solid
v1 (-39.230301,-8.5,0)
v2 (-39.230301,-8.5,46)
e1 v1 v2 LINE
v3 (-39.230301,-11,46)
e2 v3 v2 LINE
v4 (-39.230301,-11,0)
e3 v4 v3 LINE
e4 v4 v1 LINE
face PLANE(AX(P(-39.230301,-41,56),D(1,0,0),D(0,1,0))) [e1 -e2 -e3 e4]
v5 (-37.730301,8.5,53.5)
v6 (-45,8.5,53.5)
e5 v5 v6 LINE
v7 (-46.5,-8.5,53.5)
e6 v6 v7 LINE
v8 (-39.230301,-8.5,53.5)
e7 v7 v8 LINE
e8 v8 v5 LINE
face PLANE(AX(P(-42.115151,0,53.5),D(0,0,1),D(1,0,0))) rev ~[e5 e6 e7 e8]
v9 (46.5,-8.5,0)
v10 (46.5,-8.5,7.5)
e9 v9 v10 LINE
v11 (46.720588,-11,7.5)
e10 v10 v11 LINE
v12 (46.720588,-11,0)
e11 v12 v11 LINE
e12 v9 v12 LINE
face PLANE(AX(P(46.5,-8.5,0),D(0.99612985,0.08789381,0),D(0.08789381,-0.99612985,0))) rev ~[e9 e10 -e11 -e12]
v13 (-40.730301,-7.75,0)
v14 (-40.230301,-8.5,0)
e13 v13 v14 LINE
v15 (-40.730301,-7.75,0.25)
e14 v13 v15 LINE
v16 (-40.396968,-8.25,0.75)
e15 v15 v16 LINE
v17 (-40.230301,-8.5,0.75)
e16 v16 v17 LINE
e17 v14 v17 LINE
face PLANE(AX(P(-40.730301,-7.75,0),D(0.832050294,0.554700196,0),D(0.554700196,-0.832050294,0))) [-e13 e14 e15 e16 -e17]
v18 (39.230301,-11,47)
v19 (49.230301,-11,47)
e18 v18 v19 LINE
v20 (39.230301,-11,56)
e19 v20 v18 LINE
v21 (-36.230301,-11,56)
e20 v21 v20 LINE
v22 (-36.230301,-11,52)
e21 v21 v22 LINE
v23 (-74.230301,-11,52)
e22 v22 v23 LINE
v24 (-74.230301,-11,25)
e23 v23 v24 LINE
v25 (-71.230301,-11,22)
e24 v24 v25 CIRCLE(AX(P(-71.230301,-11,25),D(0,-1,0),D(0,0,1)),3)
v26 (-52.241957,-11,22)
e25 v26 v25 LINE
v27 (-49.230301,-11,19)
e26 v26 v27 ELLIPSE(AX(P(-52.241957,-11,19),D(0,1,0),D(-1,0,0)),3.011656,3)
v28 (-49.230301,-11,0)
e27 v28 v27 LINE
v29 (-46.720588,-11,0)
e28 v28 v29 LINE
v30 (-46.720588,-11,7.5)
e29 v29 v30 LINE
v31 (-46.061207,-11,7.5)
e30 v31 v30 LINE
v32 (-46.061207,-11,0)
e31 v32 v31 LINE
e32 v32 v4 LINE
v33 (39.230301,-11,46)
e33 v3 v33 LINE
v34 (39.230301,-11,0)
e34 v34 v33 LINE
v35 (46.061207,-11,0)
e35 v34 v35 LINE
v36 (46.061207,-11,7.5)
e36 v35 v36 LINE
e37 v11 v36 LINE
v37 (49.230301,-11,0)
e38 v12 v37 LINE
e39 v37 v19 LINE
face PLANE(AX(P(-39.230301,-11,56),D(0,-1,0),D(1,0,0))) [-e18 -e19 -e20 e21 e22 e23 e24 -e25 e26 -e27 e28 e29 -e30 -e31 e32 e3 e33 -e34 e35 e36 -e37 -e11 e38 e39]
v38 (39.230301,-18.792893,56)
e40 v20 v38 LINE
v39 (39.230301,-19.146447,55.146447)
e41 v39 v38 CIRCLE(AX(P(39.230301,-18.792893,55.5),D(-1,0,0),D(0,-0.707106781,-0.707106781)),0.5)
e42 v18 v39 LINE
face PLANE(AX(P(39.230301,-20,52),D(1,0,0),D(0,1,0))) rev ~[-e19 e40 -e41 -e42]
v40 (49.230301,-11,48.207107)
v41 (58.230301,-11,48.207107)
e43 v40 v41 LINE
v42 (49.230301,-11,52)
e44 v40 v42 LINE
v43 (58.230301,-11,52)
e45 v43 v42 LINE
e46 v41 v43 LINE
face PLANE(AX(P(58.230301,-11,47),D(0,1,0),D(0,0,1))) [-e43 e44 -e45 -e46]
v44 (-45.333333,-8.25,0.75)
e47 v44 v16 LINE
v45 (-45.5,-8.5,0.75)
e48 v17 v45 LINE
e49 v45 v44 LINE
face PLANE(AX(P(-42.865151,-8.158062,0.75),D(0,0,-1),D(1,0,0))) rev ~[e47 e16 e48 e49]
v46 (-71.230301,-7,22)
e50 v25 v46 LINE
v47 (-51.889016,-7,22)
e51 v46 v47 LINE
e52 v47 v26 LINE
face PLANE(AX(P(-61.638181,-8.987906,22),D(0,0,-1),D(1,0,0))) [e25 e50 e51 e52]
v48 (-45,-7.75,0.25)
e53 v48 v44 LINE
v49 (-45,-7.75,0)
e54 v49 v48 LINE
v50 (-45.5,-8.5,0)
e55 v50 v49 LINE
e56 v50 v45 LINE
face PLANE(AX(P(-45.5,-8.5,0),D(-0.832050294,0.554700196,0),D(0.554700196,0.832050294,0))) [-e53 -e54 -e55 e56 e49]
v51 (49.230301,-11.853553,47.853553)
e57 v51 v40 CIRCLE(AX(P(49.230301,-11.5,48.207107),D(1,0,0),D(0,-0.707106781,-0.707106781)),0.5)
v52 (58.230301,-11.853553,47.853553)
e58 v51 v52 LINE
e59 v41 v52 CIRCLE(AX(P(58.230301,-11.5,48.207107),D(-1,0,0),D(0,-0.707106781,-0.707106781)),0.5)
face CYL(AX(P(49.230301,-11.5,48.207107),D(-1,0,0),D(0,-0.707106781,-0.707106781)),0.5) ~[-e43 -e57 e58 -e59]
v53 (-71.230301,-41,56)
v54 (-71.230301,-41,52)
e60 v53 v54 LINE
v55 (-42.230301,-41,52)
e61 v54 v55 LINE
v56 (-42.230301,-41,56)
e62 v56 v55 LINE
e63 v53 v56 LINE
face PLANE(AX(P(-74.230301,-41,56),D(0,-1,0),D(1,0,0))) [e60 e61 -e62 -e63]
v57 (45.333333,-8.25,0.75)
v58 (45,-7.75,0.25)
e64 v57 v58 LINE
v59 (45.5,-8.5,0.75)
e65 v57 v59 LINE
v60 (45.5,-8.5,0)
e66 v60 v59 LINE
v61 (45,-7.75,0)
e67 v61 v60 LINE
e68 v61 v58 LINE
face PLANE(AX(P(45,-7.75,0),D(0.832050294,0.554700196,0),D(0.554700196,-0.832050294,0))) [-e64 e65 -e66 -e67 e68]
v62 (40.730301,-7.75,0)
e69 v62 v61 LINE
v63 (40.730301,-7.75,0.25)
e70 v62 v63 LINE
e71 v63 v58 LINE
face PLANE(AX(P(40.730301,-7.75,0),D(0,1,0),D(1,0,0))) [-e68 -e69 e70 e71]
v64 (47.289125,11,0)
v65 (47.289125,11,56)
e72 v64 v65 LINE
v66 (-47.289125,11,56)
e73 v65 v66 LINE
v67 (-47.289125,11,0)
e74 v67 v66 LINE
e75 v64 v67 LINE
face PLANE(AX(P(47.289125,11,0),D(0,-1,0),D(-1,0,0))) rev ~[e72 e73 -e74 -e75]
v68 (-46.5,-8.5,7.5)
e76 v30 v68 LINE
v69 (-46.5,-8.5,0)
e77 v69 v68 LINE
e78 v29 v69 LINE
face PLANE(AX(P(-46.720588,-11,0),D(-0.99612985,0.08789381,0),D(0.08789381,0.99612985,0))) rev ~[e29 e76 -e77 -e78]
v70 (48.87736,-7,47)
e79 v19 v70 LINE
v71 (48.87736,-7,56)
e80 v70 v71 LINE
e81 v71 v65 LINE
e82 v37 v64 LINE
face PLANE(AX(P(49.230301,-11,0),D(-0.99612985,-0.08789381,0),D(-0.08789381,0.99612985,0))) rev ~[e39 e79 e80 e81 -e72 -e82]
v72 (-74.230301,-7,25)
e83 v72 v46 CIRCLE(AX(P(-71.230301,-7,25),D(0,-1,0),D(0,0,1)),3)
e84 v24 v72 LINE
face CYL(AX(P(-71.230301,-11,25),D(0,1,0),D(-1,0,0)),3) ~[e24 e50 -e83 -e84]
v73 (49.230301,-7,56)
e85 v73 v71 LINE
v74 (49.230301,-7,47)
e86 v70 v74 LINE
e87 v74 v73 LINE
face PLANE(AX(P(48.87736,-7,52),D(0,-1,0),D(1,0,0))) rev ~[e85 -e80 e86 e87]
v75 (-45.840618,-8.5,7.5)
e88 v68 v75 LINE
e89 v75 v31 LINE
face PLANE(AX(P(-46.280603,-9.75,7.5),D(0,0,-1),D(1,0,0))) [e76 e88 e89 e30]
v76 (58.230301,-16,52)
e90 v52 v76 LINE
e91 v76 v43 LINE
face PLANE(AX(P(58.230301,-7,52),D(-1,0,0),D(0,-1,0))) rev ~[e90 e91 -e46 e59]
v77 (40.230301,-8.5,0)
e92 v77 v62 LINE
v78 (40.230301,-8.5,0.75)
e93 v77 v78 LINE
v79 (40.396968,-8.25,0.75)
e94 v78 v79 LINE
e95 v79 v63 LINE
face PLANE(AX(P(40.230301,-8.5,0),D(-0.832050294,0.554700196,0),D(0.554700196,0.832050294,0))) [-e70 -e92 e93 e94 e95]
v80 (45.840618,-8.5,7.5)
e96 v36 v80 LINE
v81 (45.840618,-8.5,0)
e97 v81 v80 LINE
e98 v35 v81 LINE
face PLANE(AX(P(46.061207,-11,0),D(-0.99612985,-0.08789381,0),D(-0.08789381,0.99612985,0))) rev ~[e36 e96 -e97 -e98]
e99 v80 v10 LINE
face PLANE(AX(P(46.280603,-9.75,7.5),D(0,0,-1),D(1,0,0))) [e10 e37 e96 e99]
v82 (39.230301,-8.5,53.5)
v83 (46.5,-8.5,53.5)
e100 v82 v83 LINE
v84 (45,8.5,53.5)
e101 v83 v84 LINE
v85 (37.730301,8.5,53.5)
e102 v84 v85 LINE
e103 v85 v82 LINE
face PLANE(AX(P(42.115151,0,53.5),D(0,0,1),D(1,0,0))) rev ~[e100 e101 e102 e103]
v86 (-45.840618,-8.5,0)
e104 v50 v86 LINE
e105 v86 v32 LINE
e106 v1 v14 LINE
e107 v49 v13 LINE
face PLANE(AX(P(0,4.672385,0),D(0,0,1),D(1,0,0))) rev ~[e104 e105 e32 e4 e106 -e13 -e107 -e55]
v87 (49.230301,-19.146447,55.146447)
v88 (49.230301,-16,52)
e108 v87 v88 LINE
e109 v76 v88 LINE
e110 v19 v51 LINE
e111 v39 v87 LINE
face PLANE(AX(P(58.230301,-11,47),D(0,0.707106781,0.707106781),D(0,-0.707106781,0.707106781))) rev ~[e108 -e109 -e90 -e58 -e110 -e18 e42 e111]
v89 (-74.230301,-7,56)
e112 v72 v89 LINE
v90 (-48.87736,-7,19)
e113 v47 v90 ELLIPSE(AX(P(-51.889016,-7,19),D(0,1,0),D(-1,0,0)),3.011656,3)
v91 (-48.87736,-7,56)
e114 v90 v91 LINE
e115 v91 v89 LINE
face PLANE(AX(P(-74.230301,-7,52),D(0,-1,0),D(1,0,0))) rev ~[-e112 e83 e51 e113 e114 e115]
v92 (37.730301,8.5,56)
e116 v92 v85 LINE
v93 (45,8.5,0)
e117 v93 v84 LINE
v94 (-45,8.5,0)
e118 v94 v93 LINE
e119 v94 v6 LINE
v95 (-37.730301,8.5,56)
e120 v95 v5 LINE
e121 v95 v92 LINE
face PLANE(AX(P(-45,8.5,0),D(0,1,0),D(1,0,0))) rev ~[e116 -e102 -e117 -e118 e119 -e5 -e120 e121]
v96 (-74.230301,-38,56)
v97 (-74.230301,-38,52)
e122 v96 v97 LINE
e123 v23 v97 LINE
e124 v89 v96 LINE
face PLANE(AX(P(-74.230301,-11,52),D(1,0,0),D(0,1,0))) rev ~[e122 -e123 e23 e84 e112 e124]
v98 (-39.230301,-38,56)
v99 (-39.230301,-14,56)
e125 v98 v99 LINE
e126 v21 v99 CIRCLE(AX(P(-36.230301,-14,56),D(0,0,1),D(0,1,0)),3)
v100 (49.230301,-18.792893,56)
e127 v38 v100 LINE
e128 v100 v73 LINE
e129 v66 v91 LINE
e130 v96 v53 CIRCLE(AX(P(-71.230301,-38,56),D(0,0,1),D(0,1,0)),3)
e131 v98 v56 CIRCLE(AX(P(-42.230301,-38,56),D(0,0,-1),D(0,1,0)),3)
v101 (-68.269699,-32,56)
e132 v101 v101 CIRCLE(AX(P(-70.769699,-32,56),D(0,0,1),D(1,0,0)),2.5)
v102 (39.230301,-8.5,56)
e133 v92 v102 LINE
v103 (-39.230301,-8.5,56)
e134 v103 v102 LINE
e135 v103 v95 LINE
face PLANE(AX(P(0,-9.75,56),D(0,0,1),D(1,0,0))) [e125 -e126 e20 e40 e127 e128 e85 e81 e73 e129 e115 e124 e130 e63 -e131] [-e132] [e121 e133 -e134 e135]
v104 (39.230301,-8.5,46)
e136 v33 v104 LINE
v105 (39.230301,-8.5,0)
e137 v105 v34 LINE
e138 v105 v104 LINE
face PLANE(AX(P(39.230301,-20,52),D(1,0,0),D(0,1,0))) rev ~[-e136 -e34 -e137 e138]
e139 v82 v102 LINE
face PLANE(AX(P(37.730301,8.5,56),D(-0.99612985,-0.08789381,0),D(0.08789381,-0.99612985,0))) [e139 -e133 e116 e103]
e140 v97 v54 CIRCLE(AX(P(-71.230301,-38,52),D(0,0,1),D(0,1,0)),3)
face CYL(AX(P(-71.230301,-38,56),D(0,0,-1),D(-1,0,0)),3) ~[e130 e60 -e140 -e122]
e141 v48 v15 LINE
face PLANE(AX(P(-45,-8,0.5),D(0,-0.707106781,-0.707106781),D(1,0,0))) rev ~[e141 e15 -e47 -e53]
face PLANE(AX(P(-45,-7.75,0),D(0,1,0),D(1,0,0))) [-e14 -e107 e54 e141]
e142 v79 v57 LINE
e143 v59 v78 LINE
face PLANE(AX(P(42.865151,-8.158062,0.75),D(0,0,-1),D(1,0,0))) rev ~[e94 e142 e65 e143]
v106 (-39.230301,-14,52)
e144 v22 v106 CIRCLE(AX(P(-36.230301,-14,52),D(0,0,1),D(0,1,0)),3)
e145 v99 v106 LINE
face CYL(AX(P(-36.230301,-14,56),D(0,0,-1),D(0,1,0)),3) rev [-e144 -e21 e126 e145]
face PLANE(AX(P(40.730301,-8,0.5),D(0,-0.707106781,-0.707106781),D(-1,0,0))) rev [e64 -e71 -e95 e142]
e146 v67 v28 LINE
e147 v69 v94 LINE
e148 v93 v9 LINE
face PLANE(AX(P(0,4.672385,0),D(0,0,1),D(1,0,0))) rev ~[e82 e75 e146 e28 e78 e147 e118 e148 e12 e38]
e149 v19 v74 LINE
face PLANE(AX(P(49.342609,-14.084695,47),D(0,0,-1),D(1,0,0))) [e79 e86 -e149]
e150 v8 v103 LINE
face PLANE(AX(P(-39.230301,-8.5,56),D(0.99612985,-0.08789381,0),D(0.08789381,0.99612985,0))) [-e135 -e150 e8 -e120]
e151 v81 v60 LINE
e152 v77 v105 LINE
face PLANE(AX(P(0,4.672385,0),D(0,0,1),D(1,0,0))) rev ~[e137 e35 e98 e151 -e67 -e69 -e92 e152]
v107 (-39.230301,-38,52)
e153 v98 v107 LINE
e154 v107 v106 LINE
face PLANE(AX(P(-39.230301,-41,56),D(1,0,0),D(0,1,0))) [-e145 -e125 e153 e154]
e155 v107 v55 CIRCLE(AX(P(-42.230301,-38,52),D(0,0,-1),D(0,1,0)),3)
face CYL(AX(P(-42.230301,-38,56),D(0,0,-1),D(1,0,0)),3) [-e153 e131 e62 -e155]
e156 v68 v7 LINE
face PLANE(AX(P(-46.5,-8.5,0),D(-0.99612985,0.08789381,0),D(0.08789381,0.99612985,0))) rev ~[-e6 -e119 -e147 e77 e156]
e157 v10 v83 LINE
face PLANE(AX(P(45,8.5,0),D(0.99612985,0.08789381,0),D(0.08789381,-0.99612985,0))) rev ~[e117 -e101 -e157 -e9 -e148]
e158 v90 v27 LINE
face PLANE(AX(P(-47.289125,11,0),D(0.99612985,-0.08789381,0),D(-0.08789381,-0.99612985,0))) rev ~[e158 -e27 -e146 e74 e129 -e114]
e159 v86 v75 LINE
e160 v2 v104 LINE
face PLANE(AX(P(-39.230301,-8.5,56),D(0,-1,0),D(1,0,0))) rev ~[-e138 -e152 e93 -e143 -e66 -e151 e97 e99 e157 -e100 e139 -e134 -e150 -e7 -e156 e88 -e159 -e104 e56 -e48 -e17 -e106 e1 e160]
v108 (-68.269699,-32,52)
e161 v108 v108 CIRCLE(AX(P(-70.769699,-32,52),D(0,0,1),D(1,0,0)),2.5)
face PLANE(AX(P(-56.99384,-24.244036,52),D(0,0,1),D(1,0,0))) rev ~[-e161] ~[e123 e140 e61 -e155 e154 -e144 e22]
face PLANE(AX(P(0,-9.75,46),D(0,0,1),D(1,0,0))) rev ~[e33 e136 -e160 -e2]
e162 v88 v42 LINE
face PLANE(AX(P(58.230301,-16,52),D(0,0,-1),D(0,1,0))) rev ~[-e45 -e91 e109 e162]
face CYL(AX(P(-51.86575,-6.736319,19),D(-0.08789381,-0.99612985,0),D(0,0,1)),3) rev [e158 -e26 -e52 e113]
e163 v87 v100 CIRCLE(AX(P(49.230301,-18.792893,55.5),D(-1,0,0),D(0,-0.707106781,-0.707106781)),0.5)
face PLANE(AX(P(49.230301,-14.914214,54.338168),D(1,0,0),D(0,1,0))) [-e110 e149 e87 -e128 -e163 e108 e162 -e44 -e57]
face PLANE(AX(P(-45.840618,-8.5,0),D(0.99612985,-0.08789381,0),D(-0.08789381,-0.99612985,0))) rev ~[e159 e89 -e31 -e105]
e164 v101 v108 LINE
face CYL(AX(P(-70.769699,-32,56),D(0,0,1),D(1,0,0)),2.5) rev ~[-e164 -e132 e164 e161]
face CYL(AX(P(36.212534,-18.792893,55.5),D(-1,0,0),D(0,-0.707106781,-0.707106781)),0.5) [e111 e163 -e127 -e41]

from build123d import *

# Parameters (mm, degrees)
F1_DEPTH     = 56
F3_DEPTH     = 2.5
F5_DEPTH     = 0.75
F6_SIZE      = 0.5
F7_SIZE      = 0.5
F9_DEPTH     = 7.5
F11_DEPTH    = 4
F13_DEPTH    = 30
F15_DEPTH    = 5
F16_W        = 4
F16_H        = 9
F17_DEPTH    = 9
F19_DEPTH    = 10
F20_T1_DEPTH = 25.0355339059
F20_T3_DEPTH = 10.25
F20_T5_DEPTH = 12.017766953
F21_W        = 78.4606024017
F21_H        = 2.5
F22_DEPTH    = 10
F23_R        = 2.5
F24_DEPTH    = 4
F25_R        = 3
F27_DEPTH    = 9


# Not quite as in the source:
# - a fillet or chamfer that OpenCascade refuses, or shapes differently, is made with other operations: its cross-section is extruded or revolved along the edge and cut away or added


with BuildPart() as f1:
    # F0 (on Top) → F1 (new body)
    with BuildSketch(Plane.XY):
        Polygon((-39.2303012009, -8.5), (-46.5, -8.5), (-45, 8.5), (45, 8.5), (46.5, -8.5), (39.2303012009, -8.5), (39.2303012009, -11), (49.2303012009, -11), (47.2891247303, 11), (-47.2891247303, 11), (-49.2303012009, -11), (-39.2303012009, -11), align=None)
    extrude(amount=F1_DEPTH)

    # F2 (on face) → F3 (join)
    with BuildSketch(Plane.XY.offset(56)):
        Polygon((-46.5, -8.5), (-39.2303012009, -8.5), (-37.7303012009, 8.5), (-45, 8.5), align=None)
        Polygon((46.5, -8.5), (45, 8.5), (37.7303012009, 8.5), (39.2303012009, -8.5), align=None)
    extrude(amount=-F3_DEPTH)

    # F4 (on face) → F5 (join)
    with BuildSketch(Plane(origin=(0, 0, 0), x_dir=(1, 0, 0), z_dir=(0, 0, -1))):
        Polygon((-40.7303012009, 7.75), (-40.2303012009, 8.5), (-45.5, 8.5), (-45, 7.75), align=None)
        Polygon((45, 7.75), (45.5, 8.5), (40.2303012009, 8.5), (40.7303012009, 7.75), align=None)
    extrude(amount=-F5_DEPTH)

    # F6
    f6_edges = [f1.edges().sort_by_distance(p)[0] for p in [
        (42.865151, -7.75, 0.75),
    ]]
    chamfer(f6_edges, length=F6_SIZE)

    # F7
    f7_edges = [f1.edges().sort_by_distance(p)[0] for p in [
        (-42.865151, -7.75, 0.75),
    ]]
    chamfer(f7_edges, length=F7_SIZE)

    # F8 (on face) → F9 (cut)
    with BuildSketch(Plane(origin=(0, 0, 0), x_dir=(1, 0, 0), z_dir=(0, 0, -1))):
        Polygon((-46.7205882353, 11), (-46.5, 8.5), (-45.8406183737, 8.5), (-46.061206609, 11), align=None)
        Polygon((46.5, 8.5), (46.7205882353, 11), (46.061206609, 11), (45.8406183737, 8.5), align=None)
    extrude(amount=-F9_DEPTH, mode=Mode.SUBTRACT)

    # F10 (on face) → F11 (join)
    with BuildSketch(Plane.XY.offset(56)):
        Polygon((-74.2303012009, -7), (-74.2303012009, -11), (-74.2303012009, -41), (-39.2303012009, -41), (-39.2303012009, -11), (-49.2303012009, -11), (-48.8773600244, -7), align=None)
        Polygon((49.2303012009, -11), (39.2303012009, -11), (39.2303012009, -20), (58.2303012009, -20), (58.2303012009, -11), (58.2303012009, -7), (48.8773600244, -7), align=None)
    extrude(amount=-F11_DEPTH)

    # F12 (on face) → F13 (join)
    with BuildSketch(Plane(origin=(0, 0, 52), x_dir=(1, 0, 0), z_dir=(0, 0, -1))):
        Polygon((-74.2303012009, 7), (-48.8773600244, 7), (-49.2303012009, 11), (-74.2303012009, 11), align=None)
    extrude(amount=F13_DEPTH)

    # F14 (on face) → F15 (join)
    with BuildSketch(Plane(origin=(0, 0, 52), x_dir=(1, 0, 0), z_dir=(0, 0, -1))):
        Polygon((58.2303012009, 20), (39.2303012009, 20), (39.2303012009, 11), (49.2303012009, 11), (48.8773600244, 7), (58.2303012009, 7), align=None)
    extrude(amount=F15_DEPTH)

    # F16 (on face) → F17 (cut)
    with BuildSketch(Plane.YZ.offset(58.2303012009)):
        Polygon((-11, 47), (-20, 56), (-20, 47), align=None)
        with Locations((-9, 51.5)):
            Rectangle(F16_W, F16_H)
    extrude(amount=-F17_DEPTH, mode=Mode.SUBTRACT)

    # F18 (on face) → F19 (cut)
    with BuildSketch(Plane.YZ.offset(49.2303012009)):
        Polygon((-11, 47), (-20, 56), (-20, 47), align=None)
    extrude(amount=-F19_DEPTH, mode=Mode.SUBTRACT)

    # F20: fillet of radius 0.5 on 3 edges, made by hand

    # F20_s2 → F20_t1 (cut)
    with BuildSketch(Plane.YZ.offset(36.2125342479)):
        with BuildLine():
            ThreePointArc((-19.1464466094, 55.1464466094), (-19.2548329851, 55.6913417162), (-18.7928932188, 56))
            Line((-18.7928932188, 56), (-20, 56))
            Line((-20, 56), (-19.1464466094, 55.1464466094))
        make_face()
    extrude(amount=F20_T1_DEPTH, mode=Mode.SUBTRACT)

    # F20_s4 → F20_t3 (cut)
    with BuildSketch(Plane.YZ.offset(49.2303012009)):
        with BuildLine():
            ThreePointArc((-11, 55.5), (-11.1464466094, 55.8535533906), (-11.5, 56))
            Line((-11.5, 56), (-11, 56))
            Line((-11, 56), (-11, 55.5))
        make_face()
    extrude(amount=F20_T3_DEPTH, mode=Mode.SUBTRACT)

    # F20_s6 → F20_t5 (cut)
    with BuildSketch(Plane.YZ.offset(49.2303012009)):
        with BuildLine():
            ThreePointArc((-11.8535533906, 47.8535533906), (-11.3086582838, 47.7451670149), (-11, 48.2071067812))
            Line((-11, 48.2071067812), (-11, 47))
            Line((-11, 47), (-11.8535533906, 47.8535533906))
        make_face()
    extrude(amount=F20_T5_DEPTH, mode=Mode.SUBTRACT)

    # F21 (on face) → F22 (join)
    with BuildSketch(Plane.XY.offset(56)):
        with Locations((0, -9.75)):
            Rectangle(F21_W, F21_H)
    extrude(amount=-F22_DEPTH)

    # F23 (on face) → F24 (cut)
    with BuildSketch(Plane.XY.offset(56)):
        with Locations((-70.7696987991, -32)):
            Circle(F23_R)
    extrude(amount=-F24_DEPTH, mode=Mode.SUBTRACT)

    # F25
    f25_edges = [f1.edges().sort_by_distance(p)[0] for p in [
        (-74.230301, -41, 54),
        (-39.230301, -41, 54),
        (-74.230301, -9, 22),
        (-49.053831, -9, 22),
        (-39.230301, -11, 54),
    ]]
    fillet(f25_edges, radius=F25_R)

    # F26 (on face) → F27 (cut)
    with BuildSketch(Plane.YZ.offset(58.2303012009)):
        Polygon((-11, 52), (-11, 56), (-20, 56), (-16, 52), align=None)
    extrude(amount=-F27_DEPTH, mode=Mode.SUBTRACT)


solid = f1.part
